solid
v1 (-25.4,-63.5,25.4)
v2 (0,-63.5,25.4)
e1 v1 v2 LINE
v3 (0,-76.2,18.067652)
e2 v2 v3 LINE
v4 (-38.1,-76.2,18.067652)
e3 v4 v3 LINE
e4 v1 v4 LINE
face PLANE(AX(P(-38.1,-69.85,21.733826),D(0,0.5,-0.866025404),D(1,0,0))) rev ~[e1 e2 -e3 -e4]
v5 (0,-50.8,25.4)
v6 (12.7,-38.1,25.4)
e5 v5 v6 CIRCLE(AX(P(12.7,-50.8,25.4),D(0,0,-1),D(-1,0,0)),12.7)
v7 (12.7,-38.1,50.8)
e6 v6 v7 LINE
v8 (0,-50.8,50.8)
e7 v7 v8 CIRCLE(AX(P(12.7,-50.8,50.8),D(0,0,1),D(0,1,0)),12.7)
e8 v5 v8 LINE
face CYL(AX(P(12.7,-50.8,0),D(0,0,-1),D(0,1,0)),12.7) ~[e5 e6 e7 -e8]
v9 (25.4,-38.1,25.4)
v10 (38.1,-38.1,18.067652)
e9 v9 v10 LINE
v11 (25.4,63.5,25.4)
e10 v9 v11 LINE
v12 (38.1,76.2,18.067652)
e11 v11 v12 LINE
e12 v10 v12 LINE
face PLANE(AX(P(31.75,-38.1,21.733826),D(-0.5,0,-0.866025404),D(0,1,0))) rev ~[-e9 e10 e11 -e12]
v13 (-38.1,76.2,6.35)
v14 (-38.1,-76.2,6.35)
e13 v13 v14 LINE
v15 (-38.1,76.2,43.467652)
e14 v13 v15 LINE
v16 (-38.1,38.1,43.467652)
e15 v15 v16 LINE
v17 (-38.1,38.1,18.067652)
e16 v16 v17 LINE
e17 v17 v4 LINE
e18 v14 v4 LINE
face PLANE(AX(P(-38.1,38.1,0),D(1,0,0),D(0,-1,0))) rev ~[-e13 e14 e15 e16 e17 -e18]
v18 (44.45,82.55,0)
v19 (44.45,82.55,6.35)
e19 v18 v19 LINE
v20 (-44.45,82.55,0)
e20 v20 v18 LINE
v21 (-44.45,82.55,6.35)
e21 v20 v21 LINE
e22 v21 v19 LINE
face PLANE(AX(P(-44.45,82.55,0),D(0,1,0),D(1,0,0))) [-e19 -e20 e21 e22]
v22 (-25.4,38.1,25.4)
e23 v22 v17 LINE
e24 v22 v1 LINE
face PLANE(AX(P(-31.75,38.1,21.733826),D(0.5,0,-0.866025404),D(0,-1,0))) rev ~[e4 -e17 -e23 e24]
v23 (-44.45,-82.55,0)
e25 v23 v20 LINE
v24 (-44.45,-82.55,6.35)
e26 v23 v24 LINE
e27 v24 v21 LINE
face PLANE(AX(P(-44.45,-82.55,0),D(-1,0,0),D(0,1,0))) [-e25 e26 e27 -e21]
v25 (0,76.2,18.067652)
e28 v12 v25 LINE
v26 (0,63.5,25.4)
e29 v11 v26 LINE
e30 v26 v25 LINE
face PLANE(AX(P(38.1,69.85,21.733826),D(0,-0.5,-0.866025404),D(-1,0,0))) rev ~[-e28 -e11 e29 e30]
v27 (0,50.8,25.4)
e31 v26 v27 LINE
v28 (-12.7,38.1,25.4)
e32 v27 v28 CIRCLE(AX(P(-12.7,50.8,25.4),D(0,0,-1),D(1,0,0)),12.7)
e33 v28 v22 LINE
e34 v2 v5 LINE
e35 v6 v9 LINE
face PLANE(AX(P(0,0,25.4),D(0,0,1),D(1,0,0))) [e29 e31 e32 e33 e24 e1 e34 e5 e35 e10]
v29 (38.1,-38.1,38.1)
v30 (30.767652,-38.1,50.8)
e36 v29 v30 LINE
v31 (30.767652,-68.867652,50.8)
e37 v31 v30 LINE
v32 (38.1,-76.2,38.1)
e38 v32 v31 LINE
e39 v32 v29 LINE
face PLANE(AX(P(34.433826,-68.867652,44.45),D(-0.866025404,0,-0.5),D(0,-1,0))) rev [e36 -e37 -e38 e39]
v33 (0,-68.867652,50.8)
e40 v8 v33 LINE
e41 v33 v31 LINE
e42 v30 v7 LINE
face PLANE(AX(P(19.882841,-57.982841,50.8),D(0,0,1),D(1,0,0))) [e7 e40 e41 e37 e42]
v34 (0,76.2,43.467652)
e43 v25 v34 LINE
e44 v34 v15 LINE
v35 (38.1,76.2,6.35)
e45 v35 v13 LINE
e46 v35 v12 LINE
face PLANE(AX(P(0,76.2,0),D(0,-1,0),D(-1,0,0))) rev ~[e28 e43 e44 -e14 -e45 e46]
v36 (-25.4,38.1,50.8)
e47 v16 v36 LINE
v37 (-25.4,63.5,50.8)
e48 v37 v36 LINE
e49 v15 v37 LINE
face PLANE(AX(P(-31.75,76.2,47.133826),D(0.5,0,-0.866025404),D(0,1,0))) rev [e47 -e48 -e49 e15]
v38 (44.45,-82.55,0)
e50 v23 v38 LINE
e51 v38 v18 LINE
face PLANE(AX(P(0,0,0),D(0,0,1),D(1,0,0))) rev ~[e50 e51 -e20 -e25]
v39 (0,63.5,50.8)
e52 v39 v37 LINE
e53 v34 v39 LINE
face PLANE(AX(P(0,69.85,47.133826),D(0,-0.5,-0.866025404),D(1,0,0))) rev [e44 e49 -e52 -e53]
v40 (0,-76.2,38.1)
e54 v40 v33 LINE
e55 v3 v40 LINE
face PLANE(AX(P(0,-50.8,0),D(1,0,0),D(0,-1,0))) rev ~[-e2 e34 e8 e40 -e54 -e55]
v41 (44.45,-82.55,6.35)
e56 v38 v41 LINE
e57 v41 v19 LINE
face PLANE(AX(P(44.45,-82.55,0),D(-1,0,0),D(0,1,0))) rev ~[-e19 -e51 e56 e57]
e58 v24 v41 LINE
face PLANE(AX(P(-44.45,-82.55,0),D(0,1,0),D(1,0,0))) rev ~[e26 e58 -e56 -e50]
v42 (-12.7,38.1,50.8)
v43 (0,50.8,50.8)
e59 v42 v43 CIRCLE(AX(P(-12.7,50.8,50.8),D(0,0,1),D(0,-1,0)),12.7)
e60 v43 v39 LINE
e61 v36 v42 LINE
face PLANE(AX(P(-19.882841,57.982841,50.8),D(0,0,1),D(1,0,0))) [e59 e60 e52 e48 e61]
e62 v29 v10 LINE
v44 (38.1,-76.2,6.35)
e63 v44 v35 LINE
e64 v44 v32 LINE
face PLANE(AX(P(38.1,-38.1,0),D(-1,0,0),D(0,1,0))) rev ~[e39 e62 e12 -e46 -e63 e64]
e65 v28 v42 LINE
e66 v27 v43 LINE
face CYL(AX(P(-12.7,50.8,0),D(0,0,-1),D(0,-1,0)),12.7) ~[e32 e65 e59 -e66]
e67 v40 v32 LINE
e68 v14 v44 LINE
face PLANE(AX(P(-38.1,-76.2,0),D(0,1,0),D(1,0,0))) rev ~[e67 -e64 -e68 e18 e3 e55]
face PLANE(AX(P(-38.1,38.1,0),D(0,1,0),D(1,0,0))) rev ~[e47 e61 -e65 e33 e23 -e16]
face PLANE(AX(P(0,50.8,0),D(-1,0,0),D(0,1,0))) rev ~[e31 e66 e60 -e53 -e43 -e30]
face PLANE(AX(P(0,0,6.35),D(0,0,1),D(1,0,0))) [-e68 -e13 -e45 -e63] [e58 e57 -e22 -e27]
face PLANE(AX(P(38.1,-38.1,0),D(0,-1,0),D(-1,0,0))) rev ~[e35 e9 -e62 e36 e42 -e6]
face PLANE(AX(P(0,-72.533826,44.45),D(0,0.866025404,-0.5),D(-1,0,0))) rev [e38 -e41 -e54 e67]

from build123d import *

# Parameters (mm, degrees)
F0_W        = 88.9
F0_H        = 165.1
F1_DEPTH    = 6.35
F2_DEPTH    = 25.4
F3_DEPTH    = 50.8
F4_SIZE2    = 7.3323484187
F4_SIZE     = 12.7
F5_C1_SIZE2 = 12.7
F5_C1_SIZE  = 7.3323484187
F5_C2_SIZE2 = 7.3323484187
F5_C2_SIZE  = 12.7
F5_C3_SIZE2 = 12.7
F5_C3_SIZE  = 7.3323484187
F5_C4_SIZE2 = 7.3323484187
F5_C4_SIZE  = 12.7


with BuildPart() as f1:
    # F0 (on Top) → F1 (new body)
    with BuildSketch(Plane.XY):
        Rectangle(F0_W, F0_H)
        Polygon((0, 76.2), (38.1, 76.2), (38.1, -38.1), (38.1, -76.2), (0, -76.2), (-38.1, -76.2), (-38.1, 38.1), (-38.1, 76.2), align=None, mode=Mode.SUBTRACT)
    extrude(amount=F1_DEPTH)

    # F0 (on Top) → F2 (join)
    with BuildSketch(Plane.XY):
        with BuildLine():
            Line((38.1, -38.1), (38.1, 76.2))
            Line((38.1, 76.2), (0, 76.2))
            Line((0, 76.2), (0, 50.8))
            ThreePointArc((0, 50.8), (-3.7197438789, 41.8197438789), (-12.7, 38.1))
            Line((-12.7, 38.1), (-38.1, 38.1))
            Line((-38.1, 38.1), (-38.1, -76.2))
            Line((-38.1, -76.2), (0, -76.2))
            Line((0, -76.2), (0, -50.8))
            ThreePointArc((0, -50.8), (3.7197438789, -41.8197438789), (12.7, -38.1))
            Line((12.7, -38.1), (38.1, -38.1))
        make_face()
    extrude(amount=F2_DEPTH)

    # F0 (on Top) → F3 (join)
    with BuildSketch(Plane.XY):
        with BuildLine():
            Line((0, 50.8), (0, 76.2))
            Line((0, 76.2), (-38.1, 76.2))
            Line((-38.1, 76.2), (-38.1, 38.1))
            Line((-38.1, 38.1), (-12.7, 38.1))
            ThreePointArc((-12.7, 38.1), (-3.7197438789, 41.8197438789), (0, 50.8))
        make_face()
        with BuildLine():
            Line((38.1, -76.2), (38.1, -38.1))
            Line((38.1, -38.1), (12.7, -38.1))
            ThreePointArc((12.7, -38.1), (3.7197438789, -41.8197438789), (0, -50.8))
            Line((0, -50.8), (0, -76.2))
            Line((0, -76.2), (38.1, -76.2))
        make_face()
    extrude(amount=F3_DEPTH)

    # F4
    f4_edges = [f1.edges().sort_by_distance(p)[0] for p in [
        (-38.1, -19.05, 25.4),
        (19.05, 76.2, 25.4),
        (38.1, 19.05, 25.4),
        (-19.05, -76.2, 25.4),
    ]]
    f4_side = f1.faces().sort_by_distance((0, 0, 25.4))[0]
    chamfer(f4_edges, length=F4_SIZE, length2=F4_SIZE2, reference=f4_side)

    # F5: chamfer of 12.7 x 7.3323484187 on 4 edges, made by hand

    # F5_c1
    f5_c1_edges = [f1.edges().sort_by_distance(p)[0] for p in [
        (-38.1, 57.15, 50.8),
    ]]
    f5_c1_side = f1.faces().sort_by_distance((-38.1, 57.15, 50.6533530316))[0]
    chamfer(f5_c1_edges, length=F5_C1_SIZE, length2=F5_C1_SIZE2, reference=f5_c1_side)

    # F5_c2
    f5_c2_edges = [f1.edges().sort_by_distance(p)[0] for p in [
        (19.05, -76.2, 50.8),
    ]]
    f5_c2_side = f1.faces().sort_by_distance((19.05, -76.2, 50.6533530316))[0]
    chamfer(f5_c2_edges, length=F5_C2_SIZE, length2=F5_C2_SIZE2, reference=f5_c2_side)

    # F5_c3
    f5_c3_edges = [f1.edges().sort_by_distance(p)[0] for p in [
        (-12.7, 76.2, 50.8),
    ]]
    f5_c3_side = f1.faces().sort_by_distance((-12.7, 76.2, 50.6533530316))[0]
    chamfer(f5_c3_edges, length=F5_C3_SIZE, length2=F5_C3_SIZE2, reference=f5_c3_side)

    # F5_c4
    f5_c4_edges = [f1.edges().sort_by_distance(p)[0] for p in [
        (38.1, -53.4838257906, 50.8),
    ]]
    f5_c4_side = f1.faces().sort_by_distance((38.1, -53.4838257906, 50.6533530316))[0]
    chamfer(f5_c4_edges, length=F5_C4_SIZE, length2=F5_C4_SIZE2, reference=f5_c4_side)


solid = f1.part
